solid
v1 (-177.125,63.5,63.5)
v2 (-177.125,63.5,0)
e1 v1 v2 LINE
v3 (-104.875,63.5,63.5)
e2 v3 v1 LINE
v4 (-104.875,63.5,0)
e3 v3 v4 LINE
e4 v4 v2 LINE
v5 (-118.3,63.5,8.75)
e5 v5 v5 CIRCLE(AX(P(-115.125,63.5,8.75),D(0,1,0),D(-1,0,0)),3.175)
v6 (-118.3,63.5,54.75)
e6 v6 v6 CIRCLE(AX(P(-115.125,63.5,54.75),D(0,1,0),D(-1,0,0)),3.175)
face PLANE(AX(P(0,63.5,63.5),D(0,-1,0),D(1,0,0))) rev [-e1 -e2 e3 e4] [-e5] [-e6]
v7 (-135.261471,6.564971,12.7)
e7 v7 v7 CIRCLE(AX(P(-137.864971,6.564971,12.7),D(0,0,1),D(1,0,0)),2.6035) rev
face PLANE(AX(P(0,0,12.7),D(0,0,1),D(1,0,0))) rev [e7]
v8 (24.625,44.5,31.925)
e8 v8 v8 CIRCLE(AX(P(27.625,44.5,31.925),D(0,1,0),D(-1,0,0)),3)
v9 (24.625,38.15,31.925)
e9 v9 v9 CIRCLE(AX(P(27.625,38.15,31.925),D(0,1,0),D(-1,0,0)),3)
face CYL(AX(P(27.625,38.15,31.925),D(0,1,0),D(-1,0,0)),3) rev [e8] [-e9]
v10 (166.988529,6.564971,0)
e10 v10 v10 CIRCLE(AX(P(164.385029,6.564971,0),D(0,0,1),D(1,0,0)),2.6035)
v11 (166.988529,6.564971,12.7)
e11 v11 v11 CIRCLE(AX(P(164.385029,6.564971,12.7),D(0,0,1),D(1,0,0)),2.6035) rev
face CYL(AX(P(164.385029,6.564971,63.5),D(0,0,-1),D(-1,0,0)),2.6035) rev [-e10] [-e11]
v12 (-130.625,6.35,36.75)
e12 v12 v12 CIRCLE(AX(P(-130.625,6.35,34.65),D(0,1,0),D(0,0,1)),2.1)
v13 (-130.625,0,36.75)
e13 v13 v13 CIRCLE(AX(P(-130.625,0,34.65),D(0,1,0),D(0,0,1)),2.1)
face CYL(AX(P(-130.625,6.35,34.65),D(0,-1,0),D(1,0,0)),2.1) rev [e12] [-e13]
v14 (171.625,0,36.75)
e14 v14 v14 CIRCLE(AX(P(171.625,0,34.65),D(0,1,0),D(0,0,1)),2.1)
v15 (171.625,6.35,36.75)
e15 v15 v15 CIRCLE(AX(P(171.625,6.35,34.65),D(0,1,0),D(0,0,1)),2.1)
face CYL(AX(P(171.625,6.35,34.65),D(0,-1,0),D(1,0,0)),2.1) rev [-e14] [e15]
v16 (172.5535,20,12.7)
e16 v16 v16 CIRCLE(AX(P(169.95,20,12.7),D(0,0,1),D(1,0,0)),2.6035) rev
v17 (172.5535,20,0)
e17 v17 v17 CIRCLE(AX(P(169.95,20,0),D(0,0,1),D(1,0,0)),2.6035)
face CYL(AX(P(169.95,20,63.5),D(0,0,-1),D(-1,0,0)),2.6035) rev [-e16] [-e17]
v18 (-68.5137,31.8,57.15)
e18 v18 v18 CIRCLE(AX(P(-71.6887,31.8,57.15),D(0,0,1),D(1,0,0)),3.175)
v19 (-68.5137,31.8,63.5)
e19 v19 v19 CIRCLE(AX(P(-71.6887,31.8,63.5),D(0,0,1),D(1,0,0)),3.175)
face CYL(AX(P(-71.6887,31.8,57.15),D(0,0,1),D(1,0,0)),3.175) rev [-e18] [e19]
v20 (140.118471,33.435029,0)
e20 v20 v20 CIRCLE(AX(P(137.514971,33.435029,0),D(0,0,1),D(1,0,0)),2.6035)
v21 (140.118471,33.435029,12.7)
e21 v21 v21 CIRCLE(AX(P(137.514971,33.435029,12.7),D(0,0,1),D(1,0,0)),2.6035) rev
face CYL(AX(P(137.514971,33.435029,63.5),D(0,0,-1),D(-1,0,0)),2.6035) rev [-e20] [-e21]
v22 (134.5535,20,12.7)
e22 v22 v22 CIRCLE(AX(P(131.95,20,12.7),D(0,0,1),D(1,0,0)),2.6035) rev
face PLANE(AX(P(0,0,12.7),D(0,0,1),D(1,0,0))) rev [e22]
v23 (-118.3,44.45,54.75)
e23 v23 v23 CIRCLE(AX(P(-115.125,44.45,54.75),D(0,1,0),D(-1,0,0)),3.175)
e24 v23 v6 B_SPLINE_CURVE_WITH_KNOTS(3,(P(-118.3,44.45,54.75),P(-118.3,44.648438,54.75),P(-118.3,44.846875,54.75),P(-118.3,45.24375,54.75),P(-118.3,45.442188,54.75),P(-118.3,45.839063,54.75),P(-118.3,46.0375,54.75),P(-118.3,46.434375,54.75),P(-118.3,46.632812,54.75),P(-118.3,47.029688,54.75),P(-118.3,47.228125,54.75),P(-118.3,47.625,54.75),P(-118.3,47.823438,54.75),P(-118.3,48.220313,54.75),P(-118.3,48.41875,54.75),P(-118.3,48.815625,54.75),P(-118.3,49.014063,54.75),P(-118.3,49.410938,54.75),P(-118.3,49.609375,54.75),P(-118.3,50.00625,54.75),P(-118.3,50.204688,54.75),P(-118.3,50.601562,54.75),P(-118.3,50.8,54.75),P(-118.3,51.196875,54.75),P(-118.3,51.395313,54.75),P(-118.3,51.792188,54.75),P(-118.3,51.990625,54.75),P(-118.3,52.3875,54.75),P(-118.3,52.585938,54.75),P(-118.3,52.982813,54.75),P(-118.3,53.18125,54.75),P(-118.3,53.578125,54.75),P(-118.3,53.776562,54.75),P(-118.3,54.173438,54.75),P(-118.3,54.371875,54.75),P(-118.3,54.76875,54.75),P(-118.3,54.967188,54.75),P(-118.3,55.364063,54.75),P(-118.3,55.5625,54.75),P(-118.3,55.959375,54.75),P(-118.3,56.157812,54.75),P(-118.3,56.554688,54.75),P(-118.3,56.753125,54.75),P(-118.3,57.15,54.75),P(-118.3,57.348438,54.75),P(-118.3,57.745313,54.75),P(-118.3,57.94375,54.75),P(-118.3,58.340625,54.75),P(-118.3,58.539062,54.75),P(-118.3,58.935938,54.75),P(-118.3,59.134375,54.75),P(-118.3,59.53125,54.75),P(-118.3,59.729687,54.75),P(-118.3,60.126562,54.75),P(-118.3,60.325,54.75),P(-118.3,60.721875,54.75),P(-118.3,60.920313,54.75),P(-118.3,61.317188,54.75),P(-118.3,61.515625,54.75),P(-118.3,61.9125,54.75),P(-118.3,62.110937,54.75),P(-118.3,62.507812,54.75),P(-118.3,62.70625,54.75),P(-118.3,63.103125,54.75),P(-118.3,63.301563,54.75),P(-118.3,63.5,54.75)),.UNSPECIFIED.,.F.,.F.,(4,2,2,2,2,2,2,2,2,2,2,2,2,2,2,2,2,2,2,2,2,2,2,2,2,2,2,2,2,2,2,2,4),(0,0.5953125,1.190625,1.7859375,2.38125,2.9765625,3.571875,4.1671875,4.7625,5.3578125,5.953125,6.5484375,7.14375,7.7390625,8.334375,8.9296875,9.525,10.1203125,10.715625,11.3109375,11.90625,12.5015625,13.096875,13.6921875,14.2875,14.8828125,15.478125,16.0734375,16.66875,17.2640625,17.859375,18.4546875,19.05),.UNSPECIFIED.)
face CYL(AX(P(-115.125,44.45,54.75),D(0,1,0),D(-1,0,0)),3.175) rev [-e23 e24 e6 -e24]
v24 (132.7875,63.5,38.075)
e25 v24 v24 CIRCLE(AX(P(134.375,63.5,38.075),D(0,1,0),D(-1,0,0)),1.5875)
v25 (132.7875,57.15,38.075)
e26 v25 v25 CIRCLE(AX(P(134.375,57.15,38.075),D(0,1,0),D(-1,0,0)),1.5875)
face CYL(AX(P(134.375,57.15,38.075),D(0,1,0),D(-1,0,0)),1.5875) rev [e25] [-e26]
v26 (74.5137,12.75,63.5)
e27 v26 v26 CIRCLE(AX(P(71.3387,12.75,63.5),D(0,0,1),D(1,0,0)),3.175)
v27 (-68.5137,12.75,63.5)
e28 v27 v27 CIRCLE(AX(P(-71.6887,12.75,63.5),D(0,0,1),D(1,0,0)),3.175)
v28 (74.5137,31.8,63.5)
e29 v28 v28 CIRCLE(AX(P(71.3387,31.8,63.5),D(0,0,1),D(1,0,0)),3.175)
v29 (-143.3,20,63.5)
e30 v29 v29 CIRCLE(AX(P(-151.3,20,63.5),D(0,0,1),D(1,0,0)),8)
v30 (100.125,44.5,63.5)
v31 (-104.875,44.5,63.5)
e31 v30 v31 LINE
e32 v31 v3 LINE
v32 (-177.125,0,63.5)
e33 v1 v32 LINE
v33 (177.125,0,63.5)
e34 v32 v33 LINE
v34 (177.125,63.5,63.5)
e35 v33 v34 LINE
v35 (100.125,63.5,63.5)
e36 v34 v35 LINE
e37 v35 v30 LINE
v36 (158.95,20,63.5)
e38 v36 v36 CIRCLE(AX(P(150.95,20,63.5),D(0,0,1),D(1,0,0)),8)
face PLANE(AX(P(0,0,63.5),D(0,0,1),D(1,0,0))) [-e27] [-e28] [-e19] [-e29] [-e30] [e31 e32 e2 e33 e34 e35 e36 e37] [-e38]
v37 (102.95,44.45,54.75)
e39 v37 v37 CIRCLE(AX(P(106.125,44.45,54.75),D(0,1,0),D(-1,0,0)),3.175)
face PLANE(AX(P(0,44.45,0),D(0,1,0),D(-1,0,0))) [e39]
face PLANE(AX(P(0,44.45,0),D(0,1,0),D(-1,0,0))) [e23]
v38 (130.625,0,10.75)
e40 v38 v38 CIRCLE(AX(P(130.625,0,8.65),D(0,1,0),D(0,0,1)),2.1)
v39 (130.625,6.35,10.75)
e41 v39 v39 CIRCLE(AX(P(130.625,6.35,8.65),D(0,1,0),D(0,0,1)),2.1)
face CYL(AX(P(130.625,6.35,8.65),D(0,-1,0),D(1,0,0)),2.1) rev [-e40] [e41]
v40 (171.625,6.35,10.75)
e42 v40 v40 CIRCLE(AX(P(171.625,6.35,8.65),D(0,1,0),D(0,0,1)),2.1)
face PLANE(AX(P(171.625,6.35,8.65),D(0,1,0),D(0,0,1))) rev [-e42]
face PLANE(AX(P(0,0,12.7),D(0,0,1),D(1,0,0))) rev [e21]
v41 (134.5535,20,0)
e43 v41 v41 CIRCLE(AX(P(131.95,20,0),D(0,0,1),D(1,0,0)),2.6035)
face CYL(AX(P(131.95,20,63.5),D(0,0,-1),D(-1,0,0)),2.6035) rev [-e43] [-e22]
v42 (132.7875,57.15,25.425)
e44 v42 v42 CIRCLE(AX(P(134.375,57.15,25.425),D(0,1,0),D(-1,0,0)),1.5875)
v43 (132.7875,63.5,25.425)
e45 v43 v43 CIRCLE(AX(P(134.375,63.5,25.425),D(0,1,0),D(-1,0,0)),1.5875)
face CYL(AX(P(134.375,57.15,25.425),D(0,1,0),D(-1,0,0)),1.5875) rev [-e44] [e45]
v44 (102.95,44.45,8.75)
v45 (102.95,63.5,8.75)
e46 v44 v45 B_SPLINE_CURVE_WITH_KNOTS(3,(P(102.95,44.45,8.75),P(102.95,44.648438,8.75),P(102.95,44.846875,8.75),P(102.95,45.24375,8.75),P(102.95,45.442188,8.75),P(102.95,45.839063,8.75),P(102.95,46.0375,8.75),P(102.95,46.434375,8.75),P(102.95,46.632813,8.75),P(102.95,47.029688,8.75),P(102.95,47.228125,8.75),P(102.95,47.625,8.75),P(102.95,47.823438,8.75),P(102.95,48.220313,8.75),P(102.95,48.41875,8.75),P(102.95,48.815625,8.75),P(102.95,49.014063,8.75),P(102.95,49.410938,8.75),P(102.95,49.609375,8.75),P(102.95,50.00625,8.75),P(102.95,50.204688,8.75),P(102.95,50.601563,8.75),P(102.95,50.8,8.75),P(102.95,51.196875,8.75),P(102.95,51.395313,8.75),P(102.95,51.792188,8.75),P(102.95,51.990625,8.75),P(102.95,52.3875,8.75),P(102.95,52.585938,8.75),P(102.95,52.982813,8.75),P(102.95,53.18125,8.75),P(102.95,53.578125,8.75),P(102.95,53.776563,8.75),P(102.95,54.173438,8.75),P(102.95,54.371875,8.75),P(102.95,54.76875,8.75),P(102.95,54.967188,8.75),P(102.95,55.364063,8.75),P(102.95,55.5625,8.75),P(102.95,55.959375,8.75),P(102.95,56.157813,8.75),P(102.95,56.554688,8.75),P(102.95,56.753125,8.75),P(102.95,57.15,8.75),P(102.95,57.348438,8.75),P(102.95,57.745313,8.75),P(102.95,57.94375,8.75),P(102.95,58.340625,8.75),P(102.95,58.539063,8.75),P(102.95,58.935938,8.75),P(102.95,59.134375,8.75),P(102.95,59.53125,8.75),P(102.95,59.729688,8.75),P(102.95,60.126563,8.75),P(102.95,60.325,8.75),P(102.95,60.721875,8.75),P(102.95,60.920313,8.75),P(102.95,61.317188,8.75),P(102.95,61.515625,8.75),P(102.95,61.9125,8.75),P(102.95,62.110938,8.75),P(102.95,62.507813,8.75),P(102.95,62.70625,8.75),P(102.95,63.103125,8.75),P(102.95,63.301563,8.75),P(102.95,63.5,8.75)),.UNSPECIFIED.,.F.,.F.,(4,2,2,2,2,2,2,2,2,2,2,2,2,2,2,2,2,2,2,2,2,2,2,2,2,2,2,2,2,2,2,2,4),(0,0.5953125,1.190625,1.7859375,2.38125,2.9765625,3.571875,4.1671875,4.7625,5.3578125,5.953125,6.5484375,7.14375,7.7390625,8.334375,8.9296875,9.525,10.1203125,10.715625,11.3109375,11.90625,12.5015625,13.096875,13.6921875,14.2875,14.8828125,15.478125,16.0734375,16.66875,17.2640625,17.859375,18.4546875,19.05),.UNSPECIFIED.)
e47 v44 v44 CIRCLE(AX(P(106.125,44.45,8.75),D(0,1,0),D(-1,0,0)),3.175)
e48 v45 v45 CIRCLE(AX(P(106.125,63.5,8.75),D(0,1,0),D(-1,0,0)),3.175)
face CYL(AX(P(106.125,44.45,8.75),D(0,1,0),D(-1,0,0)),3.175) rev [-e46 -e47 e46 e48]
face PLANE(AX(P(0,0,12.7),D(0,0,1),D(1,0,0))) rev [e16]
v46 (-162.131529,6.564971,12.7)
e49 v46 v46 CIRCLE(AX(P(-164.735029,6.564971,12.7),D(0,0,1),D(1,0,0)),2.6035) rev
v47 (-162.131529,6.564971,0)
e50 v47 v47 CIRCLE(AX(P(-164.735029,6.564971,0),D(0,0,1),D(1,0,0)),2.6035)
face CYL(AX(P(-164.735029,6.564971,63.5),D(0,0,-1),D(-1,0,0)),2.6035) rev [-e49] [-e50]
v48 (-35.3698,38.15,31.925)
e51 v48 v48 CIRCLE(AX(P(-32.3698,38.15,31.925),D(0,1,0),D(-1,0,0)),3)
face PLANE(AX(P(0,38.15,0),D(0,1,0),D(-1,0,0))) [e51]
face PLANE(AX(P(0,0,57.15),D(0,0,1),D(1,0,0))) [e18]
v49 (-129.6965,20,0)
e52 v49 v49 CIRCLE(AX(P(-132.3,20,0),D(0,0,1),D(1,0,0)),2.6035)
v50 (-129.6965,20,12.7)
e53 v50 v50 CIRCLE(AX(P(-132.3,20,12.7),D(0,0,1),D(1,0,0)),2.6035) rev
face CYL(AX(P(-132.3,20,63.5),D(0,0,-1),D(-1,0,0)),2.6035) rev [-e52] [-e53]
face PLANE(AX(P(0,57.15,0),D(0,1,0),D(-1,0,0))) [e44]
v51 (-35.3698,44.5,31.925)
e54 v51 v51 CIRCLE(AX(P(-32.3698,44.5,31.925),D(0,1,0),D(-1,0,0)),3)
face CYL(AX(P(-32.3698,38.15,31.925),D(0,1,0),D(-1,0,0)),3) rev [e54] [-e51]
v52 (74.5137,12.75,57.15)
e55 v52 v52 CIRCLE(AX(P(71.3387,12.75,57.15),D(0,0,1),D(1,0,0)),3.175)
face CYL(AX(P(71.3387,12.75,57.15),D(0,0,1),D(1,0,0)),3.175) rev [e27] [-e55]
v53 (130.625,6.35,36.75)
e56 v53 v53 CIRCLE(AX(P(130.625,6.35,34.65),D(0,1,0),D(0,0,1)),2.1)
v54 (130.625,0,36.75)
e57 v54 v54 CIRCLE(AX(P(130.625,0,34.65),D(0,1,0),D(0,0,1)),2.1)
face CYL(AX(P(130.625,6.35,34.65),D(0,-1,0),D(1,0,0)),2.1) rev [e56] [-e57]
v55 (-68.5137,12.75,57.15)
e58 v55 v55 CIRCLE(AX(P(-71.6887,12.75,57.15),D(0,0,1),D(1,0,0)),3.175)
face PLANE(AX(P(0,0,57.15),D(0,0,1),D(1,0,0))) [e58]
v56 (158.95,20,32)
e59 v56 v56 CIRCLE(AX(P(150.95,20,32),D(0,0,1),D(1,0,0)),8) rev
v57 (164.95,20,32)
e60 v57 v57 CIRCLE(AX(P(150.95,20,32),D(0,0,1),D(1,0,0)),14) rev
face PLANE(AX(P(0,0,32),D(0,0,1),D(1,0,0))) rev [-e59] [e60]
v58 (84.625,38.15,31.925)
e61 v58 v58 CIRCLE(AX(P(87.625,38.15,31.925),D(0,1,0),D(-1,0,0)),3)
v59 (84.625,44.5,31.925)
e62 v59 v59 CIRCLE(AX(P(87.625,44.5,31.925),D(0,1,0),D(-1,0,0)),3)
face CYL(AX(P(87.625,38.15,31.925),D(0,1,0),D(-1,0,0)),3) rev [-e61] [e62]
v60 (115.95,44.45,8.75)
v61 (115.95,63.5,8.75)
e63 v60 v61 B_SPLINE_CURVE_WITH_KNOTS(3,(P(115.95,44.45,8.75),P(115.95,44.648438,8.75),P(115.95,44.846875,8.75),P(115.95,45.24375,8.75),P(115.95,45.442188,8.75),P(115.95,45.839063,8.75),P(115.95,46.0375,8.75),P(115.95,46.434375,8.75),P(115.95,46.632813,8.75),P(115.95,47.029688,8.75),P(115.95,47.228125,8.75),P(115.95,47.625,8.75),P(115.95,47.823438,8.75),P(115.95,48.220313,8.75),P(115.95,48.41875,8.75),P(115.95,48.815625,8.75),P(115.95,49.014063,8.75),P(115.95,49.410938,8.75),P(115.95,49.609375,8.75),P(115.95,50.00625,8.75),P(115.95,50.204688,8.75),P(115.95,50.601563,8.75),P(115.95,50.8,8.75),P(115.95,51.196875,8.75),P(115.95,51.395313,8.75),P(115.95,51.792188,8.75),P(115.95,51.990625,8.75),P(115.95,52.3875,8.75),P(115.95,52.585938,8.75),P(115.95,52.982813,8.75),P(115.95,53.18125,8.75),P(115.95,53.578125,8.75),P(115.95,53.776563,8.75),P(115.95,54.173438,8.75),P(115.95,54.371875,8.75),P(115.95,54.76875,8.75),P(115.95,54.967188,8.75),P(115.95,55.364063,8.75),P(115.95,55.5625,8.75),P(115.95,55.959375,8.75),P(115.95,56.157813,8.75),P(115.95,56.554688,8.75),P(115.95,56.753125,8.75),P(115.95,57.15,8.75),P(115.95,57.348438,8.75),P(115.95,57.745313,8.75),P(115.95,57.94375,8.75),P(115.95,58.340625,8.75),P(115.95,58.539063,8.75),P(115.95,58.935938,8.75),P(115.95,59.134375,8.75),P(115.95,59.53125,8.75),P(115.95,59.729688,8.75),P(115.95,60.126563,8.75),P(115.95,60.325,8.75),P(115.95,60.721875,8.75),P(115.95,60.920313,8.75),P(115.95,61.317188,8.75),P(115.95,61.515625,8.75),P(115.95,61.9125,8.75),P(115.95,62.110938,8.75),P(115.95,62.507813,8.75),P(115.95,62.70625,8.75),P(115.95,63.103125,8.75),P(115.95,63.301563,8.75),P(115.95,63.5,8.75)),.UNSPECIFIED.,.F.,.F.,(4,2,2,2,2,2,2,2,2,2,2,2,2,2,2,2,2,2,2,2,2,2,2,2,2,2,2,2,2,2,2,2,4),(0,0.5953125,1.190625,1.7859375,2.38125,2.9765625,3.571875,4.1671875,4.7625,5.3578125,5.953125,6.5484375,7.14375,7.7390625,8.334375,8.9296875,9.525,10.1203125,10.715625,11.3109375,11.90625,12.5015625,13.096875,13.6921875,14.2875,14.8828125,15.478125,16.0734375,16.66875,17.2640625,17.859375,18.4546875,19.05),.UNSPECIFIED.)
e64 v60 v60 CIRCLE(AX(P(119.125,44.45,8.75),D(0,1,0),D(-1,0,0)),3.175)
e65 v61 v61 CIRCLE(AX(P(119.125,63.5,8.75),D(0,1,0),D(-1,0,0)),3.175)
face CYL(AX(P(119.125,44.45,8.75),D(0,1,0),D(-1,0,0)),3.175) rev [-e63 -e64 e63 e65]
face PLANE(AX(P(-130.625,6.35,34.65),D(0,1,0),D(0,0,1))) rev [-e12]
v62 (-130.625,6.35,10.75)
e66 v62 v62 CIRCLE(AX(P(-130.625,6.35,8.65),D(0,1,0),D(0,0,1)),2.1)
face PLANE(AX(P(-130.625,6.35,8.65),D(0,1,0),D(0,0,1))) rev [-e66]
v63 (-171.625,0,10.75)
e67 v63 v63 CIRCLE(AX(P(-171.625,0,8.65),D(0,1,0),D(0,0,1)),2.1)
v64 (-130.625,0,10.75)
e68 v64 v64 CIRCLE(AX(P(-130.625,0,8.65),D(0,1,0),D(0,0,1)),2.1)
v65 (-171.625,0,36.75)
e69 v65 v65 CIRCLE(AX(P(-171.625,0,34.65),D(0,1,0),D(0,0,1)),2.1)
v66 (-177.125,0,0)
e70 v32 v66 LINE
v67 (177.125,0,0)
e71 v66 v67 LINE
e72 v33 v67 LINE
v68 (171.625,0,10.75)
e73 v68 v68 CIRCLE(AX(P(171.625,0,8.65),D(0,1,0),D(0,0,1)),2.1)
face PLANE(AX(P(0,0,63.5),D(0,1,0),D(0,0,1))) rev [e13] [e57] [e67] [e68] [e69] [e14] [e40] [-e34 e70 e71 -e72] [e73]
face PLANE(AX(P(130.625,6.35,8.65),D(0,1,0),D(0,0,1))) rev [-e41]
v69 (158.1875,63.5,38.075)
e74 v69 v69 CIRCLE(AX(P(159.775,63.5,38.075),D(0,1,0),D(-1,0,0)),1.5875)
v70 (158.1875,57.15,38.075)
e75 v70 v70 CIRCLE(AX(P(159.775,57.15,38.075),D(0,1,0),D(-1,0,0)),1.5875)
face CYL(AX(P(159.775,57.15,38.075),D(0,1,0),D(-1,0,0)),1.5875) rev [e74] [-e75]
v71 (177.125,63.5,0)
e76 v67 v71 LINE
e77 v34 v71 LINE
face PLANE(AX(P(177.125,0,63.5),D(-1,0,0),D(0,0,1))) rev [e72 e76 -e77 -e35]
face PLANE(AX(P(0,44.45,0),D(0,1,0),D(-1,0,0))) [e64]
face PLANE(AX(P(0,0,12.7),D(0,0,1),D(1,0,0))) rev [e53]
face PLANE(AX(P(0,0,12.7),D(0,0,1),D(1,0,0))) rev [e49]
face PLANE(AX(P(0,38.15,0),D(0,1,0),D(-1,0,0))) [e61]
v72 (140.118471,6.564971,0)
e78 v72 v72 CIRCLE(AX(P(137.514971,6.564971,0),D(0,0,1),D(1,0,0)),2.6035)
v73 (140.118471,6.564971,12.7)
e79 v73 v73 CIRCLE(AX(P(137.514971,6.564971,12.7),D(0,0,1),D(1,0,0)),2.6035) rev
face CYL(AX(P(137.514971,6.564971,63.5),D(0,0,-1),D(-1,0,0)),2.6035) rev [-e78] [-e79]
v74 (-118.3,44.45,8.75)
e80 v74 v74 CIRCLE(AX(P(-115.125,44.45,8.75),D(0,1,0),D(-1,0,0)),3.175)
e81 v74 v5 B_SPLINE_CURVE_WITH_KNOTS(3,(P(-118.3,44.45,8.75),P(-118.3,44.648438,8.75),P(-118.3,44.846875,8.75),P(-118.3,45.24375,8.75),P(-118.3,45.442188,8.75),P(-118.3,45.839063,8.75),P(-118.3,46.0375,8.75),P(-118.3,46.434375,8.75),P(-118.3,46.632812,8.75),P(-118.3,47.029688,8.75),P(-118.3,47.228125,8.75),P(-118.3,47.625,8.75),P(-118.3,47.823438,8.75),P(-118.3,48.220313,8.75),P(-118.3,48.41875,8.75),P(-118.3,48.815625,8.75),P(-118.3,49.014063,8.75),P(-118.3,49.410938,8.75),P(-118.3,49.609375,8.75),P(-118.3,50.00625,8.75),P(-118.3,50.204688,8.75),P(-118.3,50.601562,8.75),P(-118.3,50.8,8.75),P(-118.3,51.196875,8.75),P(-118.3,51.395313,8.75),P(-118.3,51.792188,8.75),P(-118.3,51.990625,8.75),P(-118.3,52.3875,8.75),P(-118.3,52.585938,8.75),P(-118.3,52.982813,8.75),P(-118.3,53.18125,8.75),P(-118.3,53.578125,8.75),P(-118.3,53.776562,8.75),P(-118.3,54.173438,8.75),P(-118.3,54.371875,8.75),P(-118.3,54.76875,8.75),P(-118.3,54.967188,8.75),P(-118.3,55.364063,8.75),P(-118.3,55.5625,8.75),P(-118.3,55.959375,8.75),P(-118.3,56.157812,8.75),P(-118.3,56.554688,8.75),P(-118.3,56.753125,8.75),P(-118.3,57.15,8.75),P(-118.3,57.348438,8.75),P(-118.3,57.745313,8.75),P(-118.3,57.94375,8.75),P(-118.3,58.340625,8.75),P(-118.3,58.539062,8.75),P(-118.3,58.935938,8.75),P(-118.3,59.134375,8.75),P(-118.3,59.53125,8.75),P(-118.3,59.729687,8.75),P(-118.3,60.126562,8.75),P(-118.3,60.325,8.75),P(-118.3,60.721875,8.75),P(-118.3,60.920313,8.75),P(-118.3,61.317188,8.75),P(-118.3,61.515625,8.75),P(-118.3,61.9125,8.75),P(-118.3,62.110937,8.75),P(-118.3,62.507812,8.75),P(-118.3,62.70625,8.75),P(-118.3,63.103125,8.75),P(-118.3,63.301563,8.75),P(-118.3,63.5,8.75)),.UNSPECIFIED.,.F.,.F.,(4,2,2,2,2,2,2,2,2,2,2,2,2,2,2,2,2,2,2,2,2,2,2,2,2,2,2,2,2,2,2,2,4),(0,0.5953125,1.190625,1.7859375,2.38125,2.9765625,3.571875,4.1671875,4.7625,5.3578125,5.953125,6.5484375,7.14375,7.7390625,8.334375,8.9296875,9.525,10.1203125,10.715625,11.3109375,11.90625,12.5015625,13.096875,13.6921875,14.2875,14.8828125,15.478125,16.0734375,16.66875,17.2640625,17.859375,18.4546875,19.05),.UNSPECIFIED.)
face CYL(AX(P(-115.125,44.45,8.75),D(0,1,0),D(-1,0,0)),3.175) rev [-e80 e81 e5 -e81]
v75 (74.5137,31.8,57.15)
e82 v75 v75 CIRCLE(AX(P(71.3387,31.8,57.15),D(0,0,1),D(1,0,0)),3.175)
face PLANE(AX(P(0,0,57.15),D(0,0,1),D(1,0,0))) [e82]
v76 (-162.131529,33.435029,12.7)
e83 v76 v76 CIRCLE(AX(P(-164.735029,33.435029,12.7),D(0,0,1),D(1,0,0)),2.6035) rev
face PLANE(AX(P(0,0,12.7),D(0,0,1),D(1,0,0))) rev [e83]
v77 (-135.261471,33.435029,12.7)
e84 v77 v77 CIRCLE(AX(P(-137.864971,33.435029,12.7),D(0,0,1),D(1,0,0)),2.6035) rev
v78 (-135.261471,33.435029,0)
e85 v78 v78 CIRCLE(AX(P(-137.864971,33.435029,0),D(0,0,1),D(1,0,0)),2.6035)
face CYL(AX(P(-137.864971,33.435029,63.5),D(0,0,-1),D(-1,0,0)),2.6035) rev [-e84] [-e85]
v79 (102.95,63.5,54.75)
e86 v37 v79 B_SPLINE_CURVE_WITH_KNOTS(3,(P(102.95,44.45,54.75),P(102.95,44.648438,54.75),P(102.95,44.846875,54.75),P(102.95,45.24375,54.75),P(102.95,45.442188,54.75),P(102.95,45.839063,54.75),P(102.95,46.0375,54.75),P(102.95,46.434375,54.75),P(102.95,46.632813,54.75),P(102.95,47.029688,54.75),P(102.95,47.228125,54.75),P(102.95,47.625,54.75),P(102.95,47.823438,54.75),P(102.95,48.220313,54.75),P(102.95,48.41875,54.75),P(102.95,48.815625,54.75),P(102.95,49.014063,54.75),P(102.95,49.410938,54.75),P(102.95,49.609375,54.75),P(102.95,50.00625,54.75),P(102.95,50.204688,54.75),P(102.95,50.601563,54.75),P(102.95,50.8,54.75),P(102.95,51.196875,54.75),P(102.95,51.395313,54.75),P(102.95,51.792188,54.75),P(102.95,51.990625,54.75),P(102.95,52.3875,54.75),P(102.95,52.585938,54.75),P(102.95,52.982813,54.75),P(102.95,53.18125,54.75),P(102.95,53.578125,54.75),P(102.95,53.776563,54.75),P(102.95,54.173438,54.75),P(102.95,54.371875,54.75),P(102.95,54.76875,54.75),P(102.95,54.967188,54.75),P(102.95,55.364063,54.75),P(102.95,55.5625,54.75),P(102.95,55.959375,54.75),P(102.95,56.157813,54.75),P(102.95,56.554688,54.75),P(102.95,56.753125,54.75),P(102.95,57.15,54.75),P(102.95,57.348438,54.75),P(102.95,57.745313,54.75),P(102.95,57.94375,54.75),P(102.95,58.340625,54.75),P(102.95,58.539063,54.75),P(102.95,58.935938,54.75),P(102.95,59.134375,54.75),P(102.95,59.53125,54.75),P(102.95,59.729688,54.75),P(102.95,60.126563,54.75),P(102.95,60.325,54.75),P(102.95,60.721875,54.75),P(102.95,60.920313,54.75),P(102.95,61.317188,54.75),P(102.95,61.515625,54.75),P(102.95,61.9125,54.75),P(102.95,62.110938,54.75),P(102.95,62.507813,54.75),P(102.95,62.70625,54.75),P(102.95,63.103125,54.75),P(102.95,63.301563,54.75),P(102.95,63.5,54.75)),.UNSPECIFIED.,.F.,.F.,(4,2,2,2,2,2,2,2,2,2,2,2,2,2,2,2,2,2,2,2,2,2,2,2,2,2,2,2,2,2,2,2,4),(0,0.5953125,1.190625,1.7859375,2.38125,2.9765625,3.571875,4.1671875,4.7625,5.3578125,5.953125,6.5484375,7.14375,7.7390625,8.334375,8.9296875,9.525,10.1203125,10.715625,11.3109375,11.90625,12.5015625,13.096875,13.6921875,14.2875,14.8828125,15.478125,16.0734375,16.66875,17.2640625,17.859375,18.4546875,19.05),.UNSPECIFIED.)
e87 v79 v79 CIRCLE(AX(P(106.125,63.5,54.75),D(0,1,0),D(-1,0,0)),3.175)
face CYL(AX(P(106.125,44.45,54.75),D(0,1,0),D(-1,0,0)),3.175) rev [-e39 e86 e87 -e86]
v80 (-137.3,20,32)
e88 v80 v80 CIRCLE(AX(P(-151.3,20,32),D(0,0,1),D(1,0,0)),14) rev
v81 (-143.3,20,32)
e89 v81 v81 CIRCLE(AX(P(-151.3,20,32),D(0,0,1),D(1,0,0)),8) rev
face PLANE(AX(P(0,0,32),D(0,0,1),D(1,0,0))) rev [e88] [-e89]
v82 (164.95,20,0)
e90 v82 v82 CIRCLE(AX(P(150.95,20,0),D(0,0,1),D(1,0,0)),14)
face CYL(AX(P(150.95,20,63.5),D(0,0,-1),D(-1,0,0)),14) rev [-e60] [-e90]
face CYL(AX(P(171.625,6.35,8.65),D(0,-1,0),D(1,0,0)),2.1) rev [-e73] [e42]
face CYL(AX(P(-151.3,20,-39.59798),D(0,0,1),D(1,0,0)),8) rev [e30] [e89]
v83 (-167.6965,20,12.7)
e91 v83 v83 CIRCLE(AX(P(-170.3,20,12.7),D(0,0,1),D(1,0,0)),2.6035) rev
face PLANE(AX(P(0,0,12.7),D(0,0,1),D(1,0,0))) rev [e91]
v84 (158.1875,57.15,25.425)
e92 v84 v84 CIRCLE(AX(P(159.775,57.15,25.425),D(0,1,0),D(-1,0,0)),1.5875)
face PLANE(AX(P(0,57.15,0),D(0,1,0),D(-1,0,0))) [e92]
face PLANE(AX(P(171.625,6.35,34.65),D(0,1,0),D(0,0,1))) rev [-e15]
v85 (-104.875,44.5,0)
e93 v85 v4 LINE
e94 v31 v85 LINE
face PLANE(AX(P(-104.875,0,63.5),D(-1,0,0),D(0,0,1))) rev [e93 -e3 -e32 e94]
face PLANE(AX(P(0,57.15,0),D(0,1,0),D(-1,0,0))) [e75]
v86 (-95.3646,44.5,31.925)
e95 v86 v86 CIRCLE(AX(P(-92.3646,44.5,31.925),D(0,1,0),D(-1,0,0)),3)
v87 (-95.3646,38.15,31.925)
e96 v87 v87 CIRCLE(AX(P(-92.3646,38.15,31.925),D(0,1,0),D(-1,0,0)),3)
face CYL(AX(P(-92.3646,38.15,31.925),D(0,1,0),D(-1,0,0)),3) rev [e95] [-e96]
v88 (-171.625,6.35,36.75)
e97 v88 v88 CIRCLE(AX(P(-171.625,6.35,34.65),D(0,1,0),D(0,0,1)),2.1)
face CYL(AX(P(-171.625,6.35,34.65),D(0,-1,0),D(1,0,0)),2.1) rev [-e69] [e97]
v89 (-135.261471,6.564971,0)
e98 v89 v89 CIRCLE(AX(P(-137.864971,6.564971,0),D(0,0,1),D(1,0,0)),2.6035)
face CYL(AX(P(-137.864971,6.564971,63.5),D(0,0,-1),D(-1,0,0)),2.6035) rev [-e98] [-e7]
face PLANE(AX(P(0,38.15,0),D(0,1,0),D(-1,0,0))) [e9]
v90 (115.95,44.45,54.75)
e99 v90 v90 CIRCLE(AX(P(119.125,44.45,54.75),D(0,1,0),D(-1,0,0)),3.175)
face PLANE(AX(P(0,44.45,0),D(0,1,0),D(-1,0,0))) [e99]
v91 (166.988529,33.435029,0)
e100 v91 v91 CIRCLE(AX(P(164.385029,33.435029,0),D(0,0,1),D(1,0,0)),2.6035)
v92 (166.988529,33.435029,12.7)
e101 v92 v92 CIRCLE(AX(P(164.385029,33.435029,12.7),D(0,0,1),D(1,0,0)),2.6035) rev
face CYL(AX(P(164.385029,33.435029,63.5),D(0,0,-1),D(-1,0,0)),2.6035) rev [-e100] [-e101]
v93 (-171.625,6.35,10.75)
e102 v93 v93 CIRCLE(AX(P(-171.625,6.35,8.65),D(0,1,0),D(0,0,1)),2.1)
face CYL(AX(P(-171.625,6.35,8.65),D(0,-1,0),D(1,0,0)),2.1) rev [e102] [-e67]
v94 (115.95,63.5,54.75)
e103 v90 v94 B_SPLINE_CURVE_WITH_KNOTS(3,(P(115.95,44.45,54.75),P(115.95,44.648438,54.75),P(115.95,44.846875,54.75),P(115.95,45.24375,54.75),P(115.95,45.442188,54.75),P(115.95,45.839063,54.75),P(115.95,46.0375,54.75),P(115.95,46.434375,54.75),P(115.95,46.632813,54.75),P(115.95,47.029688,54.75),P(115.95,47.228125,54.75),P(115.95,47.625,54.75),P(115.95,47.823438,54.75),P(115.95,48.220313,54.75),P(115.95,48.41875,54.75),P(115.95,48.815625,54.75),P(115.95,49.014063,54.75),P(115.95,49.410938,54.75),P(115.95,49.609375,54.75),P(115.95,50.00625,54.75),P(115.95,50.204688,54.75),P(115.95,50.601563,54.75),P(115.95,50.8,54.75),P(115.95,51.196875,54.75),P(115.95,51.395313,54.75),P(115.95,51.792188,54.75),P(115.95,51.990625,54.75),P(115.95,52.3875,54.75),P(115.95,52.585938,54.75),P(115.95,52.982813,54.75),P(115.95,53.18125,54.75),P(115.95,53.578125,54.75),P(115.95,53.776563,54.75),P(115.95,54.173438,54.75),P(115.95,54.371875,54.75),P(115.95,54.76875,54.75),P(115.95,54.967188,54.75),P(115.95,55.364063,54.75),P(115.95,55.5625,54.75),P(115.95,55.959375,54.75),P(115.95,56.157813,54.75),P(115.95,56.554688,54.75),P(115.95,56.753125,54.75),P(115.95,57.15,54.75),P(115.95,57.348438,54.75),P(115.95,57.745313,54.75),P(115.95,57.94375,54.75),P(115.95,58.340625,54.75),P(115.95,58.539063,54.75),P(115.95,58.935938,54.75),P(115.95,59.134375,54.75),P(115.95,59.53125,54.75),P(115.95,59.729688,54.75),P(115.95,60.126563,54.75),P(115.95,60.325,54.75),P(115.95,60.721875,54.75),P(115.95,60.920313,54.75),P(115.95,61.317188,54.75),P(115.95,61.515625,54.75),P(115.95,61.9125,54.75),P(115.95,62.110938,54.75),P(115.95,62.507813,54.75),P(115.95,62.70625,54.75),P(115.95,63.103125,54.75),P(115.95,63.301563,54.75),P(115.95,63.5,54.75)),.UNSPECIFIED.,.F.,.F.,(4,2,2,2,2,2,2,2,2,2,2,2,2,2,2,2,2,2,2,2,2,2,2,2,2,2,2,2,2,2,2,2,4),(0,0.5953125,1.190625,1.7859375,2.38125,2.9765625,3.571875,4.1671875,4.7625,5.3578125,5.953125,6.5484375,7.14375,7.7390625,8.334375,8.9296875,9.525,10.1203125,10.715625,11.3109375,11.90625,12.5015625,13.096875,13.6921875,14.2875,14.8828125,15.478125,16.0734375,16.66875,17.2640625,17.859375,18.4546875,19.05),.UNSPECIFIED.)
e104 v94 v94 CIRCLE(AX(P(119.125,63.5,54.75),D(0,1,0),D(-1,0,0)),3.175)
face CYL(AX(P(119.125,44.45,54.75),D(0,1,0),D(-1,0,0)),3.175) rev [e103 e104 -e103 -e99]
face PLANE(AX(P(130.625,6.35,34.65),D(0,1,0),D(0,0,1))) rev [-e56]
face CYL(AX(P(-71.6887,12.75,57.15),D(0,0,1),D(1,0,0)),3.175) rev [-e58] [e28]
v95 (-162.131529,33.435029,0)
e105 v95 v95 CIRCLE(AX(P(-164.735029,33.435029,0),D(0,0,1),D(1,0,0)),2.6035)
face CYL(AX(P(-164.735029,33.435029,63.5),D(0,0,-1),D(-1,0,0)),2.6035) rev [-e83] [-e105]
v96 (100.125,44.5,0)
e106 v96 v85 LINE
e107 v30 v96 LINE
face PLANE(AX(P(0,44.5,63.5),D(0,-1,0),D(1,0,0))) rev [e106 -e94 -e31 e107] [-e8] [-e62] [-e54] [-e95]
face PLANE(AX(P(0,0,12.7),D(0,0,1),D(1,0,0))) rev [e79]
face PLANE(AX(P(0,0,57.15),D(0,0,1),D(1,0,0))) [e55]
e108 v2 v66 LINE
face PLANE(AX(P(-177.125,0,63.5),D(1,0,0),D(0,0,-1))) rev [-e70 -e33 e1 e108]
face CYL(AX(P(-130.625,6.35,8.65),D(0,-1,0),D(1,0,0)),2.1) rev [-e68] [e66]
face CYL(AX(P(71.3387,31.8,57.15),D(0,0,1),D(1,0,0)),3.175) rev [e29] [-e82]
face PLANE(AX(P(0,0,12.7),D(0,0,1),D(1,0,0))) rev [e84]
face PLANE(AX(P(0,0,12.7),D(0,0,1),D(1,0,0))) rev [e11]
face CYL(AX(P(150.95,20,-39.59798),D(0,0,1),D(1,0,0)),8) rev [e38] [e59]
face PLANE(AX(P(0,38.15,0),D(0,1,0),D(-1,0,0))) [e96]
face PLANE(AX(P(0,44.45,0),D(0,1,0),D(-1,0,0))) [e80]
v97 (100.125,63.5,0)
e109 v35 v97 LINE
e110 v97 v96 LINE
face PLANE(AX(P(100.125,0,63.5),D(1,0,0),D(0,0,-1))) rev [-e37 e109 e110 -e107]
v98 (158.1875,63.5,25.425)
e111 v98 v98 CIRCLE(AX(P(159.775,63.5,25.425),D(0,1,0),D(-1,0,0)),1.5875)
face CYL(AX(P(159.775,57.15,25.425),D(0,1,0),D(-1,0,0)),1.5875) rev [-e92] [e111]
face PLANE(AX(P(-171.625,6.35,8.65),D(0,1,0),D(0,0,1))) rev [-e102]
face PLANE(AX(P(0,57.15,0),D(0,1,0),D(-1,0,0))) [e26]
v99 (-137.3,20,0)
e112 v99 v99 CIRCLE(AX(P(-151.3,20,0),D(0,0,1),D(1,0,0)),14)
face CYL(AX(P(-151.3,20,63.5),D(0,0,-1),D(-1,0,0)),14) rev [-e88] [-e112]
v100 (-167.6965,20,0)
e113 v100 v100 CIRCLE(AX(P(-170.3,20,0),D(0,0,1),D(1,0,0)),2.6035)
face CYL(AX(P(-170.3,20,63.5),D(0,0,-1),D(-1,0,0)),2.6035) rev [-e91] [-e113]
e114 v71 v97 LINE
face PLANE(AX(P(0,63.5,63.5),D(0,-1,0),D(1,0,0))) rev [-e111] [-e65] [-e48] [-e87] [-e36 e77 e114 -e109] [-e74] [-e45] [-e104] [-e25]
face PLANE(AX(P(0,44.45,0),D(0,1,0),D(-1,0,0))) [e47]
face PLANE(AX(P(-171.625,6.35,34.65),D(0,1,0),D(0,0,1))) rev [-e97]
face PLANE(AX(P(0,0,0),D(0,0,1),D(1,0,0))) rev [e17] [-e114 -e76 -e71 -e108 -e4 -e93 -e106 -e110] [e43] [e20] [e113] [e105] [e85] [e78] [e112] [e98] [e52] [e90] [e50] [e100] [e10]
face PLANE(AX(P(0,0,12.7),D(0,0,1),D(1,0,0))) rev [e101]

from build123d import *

# Parameters (mm, degrees)
SKETCH1_R              = 14
SKETCH1_R_2            = 2.6035
BOSS_EXTRUDE1_DEPTH    = 63.5
SKETCH2_R              = 3.175
CUT_EXTRUDE1_DEPTH     = 19.05
CUT_EXTRUDE3_START     = -63.5
CUT_EXTRUDE3_DEPTH     = 6.35
BOSS_EXTRUDE2_START    = -32
SKETCH3_R              = 14
SKETCH3_R_2            = 8
BOSS_EXTRUDE2_DEPTH    = 31.5
SKETCH4_R              = 1.5875
CUT_EXTRUDE4_DEPTH     = 6.35
BOSS_EXTRUDE3_START    = -50.8
SKETCH5_R              = 2.6035
BOSS_EXTRUDE3_DEPTH    = 50.8
CUT_EXTRUDE5_DEPTH     = 6.35
CUT_EXTRUDE6_START     = -6.35
CUT_EXTRUDE6_OUTLINE_R = 3.175
CUT_EXTRUDE6_DEPTH     = 6.35


# Read off the part's stored shape, not the designer's step: Cut-Extrude6
with BuildPart() as part:
    # Sketch1 → Boss-Extrude1 (new body)
    with BuildSketch(Plane.XY):
        Polygon((100.125, 63.5), (100.125, 44.5), (-104.875, 44.5), (-104.875, 63.5), (-177.125, 63.5), (-177.125, 0), (177.125, 0), (177.125, 63.5), align=None)
        with Locations((-151.3, 20)):
            Circle(SKETCH1_R, mode=Mode.SUBTRACT)
        with Locations((150.95, 20)):
            Circle(SKETCH1_R, mode=Mode.SUBTRACT)
        with Locations((-164.735028843, 6.564971157)):
            Circle(SKETCH1_R_2, mode=Mode.SUBTRACT)
        with Locations((-137.864971157, 6.564971157)):
            Circle(SKETCH1_R_2, mode=Mode.SUBTRACT)
        with Locations((-132.3, 20)):
            Circle(SKETCH1_R_2, mode=Mode.SUBTRACT)
        with Locations((-137.864971157, 33.435028843)):
            Circle(SKETCH1_R_2, mode=Mode.SUBTRACT)
        with Locations((-170.3, 20)):
            Circle(SKETCH1_R_2, mode=Mode.SUBTRACT)
        with Locations((-164.735028843, 33.435028843)):
            Circle(SKETCH1_R_2, mode=Mode.SUBTRACT)
        with Locations((137.514971157, 6.564971157)):
            Circle(SKETCH1_R_2, mode=Mode.SUBTRACT)
        with Locations((164.385028843, 6.564971157)):
            Circle(SKETCH1_R_2, mode=Mode.SUBTRACT)
        with Locations((169.95, 20)):
            Circle(SKETCH1_R_2, mode=Mode.SUBTRACT)
        with Locations((164.385028843, 33.435028843)):
            Circle(SKETCH1_R_2, mode=Mode.SUBTRACT)
        with Locations((131.95, 20)):
            Circle(SKETCH1_R_2, mode=Mode.SUBTRACT)
        with Locations((137.514971157, 33.435028843)):
            Circle(SKETCH1_R_2, mode=Mode.SUBTRACT)
    extrude(amount=BOSS_EXTRUDE1_DEPTH)

    # Sketch2 → Cut-Extrude1 (cut)
    with BuildSketch(Plane(origin=(0, 63.5, 0), x_dir=(1, 0, 0), z_dir=(0, 1, 0))):
        with Locations(Location((119.125, -54.75, 0), (0, 0, 180))):
            Circle(SKETCH2_R)
        with Locations(Location((106.125, -54.75, 0), (0, 0, 180))):
            Circle(SKETCH2_R)
        with Locations(Location((119.125, -8.75, 0), (0, 0, 180))):
            Circle(SKETCH2_R)
        with Locations(Location((106.125, -8.75, 0), (0, 0, 180))):
            Circle(SKETCH2_R)
        with Locations(Location((-115.125, -54.75, 0), (0, 0, 180))):
            Circle(SKETCH2_R)
        with Locations(Location((-115.125, -8.75, 0), (0, 0, 180))):
            Circle(SKETCH2_R)
    extrude(amount=-CUT_EXTRUDE1_DEPTH, mode=Mode.SUBTRACT)

    # Sketch2<3> → Cut-Extrude3 (cut)
    with BuildSketch(Plane(origin=(0, 63.5, 0), x_dir=(1, 0, 0), z_dir=(0, 1, 0)).offset(CUT_EXTRUDE3_START)):
        with BuildLine():
            ThreePointArc((169.525, -34.65), (171.625, -36.75), (173.725, -34.65))
            ThreePointArc((173.725, -34.65), (171.625, -32.55), (169.525, -34.65))
        make_face()
        with BuildLine():
            ThreePointArc((128.525, -34.65), (130.625, -36.75), (132.725, -34.65))
            ThreePointArc((132.725, -34.65), (130.625, -32.55), (128.525, -34.65))
        make_face()
        with BuildLine():
            ThreePointArc((128.525, -8.65), (130.625, -10.75), (132.725, -8.65))
            ThreePointArc((132.725, -8.65), (130.625, -6.55), (128.525, -8.65))
        make_face()
        with BuildLine():
            ThreePointArc((169.525, -8.65), (171.625, -10.75), (173.725, -8.65))
            ThreePointArc((173.725, -8.65), (171.625, -6.55), (169.525, -8.65))
        make_face()
        with BuildLine():
            ThreePointArc((-132.725, -34.65), (-130.625, -36.75), (-128.525, -34.65))
            ThreePointArc((-128.525, -34.65), (-130.625, -32.55), (-132.725, -34.65))
        make_face()
        with BuildLine():
            ThreePointArc((-132.725, -8.65), (-130.625, -10.75), (-128.525, -8.65))
            ThreePointArc((-128.525, -8.65), (-130.625, -6.55), (-132.725, -8.65))
        make_face()
        with BuildLine():
            ThreePointArc((-173.725, -8.65), (-171.625, -10.75), (-169.525, -8.65))
            ThreePointArc((-169.525, -8.65), (-171.625, -6.55), (-173.725, -8.65))
        make_face()
        with BuildLine():
            ThreePointArc((-173.725, -34.65), (-171.625, -36.75), (-169.525, -34.65))
            ThreePointArc((-169.525, -34.65), (-171.625, -32.55), (-173.725, -34.65))
        make_face()
    extrude(amount=CUT_EXTRUDE3_DEPTH, mode=Mode.SUBTRACT)

    # Sketch3 → Boss-Extrude2 (add)
    # profile 1 of 2: a face of its own
    with BuildSketch(Plane(origin=(0, 0, 0), x_dir=(-1, 0, 0), z_dir=(0, 0, -1)).offset(BOSS_EXTRUDE2_START)):
        with Locations(Location((-150.95, 20, 0), (0, 0, 180))):
            Circle(SKETCH3_R)
        with Locations(Location((-150.95, 20, 0), (0, 0, 180))):
            Circle(SKETCH3_R_2, mode=Mode.SUBTRACT)
    # profile 2 of 2: a face of its own
    with BuildSketch(Plane(origin=(0, 0, 0), x_dir=(-1, 0, 0), z_dir=(0, 0, -1)).offset(BOSS_EXTRUDE2_START)):
        with Locations(Location((151.3, 20, 0), (0, 0, 180))):
            Circle(SKETCH3_R)
        with Locations(Location((151.3, 20, 0), (0, 0, 180))):
            Circle(SKETCH3_R_2, mode=Mode.SUBTRACT)
    extrude(amount=-BOSS_EXTRUDE2_DEPTH)

    # Sketch4 → Cut-Extrude4 (cut)
    with BuildSketch(Plane(origin=(0, 63.5, 0), x_dir=(1, 0, 0), z_dir=(0, 1, 0))):
        with Locations(Location((159.775, -38.075, 0), (0, 0, 180))):
            Circle(SKETCH4_R)
        with Locations(Location((159.775, -25.425, 0), (0, 0, 180))):
            Circle(SKETCH4_R)
        with Locations(Location((134.375, -25.425, 0), (0, 0, 180))):
            Circle(SKETCH4_R)
        with Locations(Location((134.375, -38.075, 0), (0, 0, 180))):
            Circle(SKETCH4_R)
    extrude(amount=-CUT_EXTRUDE4_DEPTH, mode=Mode.SUBTRACT)

    # Sketch5 → Boss-Extrude3 (add)
    with BuildSketch(Plane.XY.offset(63.5).offset(BOSS_EXTRUDE3_START)):
        with Locations((131.95, 20)):
            Circle(SKETCH5_R)
        with Locations((137.514971157, 6.564971157)):
            Circle(SKETCH5_R)
        with Locations((164.385028843, 6.564971157)):
            Circle(SKETCH5_R)
        with Locations((169.95, 20)):
            Circle(SKETCH5_R)
        with Locations((164.385028843, 33.435028843)):
            Circle(SKETCH5_R)
        with Locations((137.514971157, 33.435028843)):
            Circle(SKETCH5_R)
        with Locations((-137.864971157, 6.564971157)):
            Circle(SKETCH5_R)
        with Locations((-132.3, 20)):
            Circle(SKETCH5_R)
        with Locations((-137.864971157, 33.435028843)):
            Circle(SKETCH5_R)
        with Locations((-164.735028843, 6.564971157)):
            Circle(SKETCH5_R)
        with Locations((-170.3, 20)):
            Circle(SKETCH5_R)
        with Locations((-164.735028843, 33.435028843)):
            Circle(SKETCH5_R)
    extrude(amount=BOSS_EXTRUDE3_DEPTH)

    # Sketch6 → Cut-Extrude5 (cut)
    with BuildSketch(Plane(origin=(0, 44.5, 0), x_dir=(1, 0, 0), z_dir=(0, 1, 0))):
        with BuildLine():
            ThreePointArc((87.625, -34.925), (90.625, -31.925), (87.625, -28.925))
            ThreePointArc((87.625, -28.925), (84.625, -31.925), (87.625, -34.925))
        make_face()
        with BuildLine():
            ThreePointArc((27.625, -34.925), (30.625, -31.925), (27.625, -28.925))
            ThreePointArc((27.625, -28.925), (24.625, -31.925), (27.625, -34.925))
        make_face()
        with BuildLine():
            ThreePointArc((-32.3698, -34.925), (-29.3698, -31.925), (-32.3698, -28.925))
            ThreePointArc((-32.3698, -28.925), (-35.3698, -31.925), (-32.3698, -34.925))
        make_face()
        with BuildLine():
            ThreePointArc((-92.3646, -34.925), (-89.3646, -31.925), (-92.3646, -28.925))
            ThreePointArc((-92.3646, -28.925), (-95.3646, -31.925), (-92.3646, -34.925))
        make_face()
    extrude(amount=-CUT_EXTRUDE5_DEPTH, mode=Mode.SUBTRACT)

    # Cut-Extrude6 outline → Cut-Extrude6 (cut)
    with BuildSketch(Plane.XY.offset(63.5).offset(CUT_EXTRUDE6_START)):
        with Locations((-71.6887, 31.8)):
            Circle(CUT_EXTRUDE6_OUTLINE_R)
        with Locations((71.3387, 12.75)):
            Circle(CUT_EXTRUDE6_OUTLINE_R)
        with Locations((71.3387, 31.8)):
            Circle(CUT_EXTRUDE6_OUTLINE_R)
        with Locations((-71.6887, 12.75)):
            Circle(CUT_EXTRUDE6_OUTLINE_R)
    extrude(amount=CUT_EXTRUDE6_DEPTH, mode=Mode.SUBTRACT)


solid = part.part
